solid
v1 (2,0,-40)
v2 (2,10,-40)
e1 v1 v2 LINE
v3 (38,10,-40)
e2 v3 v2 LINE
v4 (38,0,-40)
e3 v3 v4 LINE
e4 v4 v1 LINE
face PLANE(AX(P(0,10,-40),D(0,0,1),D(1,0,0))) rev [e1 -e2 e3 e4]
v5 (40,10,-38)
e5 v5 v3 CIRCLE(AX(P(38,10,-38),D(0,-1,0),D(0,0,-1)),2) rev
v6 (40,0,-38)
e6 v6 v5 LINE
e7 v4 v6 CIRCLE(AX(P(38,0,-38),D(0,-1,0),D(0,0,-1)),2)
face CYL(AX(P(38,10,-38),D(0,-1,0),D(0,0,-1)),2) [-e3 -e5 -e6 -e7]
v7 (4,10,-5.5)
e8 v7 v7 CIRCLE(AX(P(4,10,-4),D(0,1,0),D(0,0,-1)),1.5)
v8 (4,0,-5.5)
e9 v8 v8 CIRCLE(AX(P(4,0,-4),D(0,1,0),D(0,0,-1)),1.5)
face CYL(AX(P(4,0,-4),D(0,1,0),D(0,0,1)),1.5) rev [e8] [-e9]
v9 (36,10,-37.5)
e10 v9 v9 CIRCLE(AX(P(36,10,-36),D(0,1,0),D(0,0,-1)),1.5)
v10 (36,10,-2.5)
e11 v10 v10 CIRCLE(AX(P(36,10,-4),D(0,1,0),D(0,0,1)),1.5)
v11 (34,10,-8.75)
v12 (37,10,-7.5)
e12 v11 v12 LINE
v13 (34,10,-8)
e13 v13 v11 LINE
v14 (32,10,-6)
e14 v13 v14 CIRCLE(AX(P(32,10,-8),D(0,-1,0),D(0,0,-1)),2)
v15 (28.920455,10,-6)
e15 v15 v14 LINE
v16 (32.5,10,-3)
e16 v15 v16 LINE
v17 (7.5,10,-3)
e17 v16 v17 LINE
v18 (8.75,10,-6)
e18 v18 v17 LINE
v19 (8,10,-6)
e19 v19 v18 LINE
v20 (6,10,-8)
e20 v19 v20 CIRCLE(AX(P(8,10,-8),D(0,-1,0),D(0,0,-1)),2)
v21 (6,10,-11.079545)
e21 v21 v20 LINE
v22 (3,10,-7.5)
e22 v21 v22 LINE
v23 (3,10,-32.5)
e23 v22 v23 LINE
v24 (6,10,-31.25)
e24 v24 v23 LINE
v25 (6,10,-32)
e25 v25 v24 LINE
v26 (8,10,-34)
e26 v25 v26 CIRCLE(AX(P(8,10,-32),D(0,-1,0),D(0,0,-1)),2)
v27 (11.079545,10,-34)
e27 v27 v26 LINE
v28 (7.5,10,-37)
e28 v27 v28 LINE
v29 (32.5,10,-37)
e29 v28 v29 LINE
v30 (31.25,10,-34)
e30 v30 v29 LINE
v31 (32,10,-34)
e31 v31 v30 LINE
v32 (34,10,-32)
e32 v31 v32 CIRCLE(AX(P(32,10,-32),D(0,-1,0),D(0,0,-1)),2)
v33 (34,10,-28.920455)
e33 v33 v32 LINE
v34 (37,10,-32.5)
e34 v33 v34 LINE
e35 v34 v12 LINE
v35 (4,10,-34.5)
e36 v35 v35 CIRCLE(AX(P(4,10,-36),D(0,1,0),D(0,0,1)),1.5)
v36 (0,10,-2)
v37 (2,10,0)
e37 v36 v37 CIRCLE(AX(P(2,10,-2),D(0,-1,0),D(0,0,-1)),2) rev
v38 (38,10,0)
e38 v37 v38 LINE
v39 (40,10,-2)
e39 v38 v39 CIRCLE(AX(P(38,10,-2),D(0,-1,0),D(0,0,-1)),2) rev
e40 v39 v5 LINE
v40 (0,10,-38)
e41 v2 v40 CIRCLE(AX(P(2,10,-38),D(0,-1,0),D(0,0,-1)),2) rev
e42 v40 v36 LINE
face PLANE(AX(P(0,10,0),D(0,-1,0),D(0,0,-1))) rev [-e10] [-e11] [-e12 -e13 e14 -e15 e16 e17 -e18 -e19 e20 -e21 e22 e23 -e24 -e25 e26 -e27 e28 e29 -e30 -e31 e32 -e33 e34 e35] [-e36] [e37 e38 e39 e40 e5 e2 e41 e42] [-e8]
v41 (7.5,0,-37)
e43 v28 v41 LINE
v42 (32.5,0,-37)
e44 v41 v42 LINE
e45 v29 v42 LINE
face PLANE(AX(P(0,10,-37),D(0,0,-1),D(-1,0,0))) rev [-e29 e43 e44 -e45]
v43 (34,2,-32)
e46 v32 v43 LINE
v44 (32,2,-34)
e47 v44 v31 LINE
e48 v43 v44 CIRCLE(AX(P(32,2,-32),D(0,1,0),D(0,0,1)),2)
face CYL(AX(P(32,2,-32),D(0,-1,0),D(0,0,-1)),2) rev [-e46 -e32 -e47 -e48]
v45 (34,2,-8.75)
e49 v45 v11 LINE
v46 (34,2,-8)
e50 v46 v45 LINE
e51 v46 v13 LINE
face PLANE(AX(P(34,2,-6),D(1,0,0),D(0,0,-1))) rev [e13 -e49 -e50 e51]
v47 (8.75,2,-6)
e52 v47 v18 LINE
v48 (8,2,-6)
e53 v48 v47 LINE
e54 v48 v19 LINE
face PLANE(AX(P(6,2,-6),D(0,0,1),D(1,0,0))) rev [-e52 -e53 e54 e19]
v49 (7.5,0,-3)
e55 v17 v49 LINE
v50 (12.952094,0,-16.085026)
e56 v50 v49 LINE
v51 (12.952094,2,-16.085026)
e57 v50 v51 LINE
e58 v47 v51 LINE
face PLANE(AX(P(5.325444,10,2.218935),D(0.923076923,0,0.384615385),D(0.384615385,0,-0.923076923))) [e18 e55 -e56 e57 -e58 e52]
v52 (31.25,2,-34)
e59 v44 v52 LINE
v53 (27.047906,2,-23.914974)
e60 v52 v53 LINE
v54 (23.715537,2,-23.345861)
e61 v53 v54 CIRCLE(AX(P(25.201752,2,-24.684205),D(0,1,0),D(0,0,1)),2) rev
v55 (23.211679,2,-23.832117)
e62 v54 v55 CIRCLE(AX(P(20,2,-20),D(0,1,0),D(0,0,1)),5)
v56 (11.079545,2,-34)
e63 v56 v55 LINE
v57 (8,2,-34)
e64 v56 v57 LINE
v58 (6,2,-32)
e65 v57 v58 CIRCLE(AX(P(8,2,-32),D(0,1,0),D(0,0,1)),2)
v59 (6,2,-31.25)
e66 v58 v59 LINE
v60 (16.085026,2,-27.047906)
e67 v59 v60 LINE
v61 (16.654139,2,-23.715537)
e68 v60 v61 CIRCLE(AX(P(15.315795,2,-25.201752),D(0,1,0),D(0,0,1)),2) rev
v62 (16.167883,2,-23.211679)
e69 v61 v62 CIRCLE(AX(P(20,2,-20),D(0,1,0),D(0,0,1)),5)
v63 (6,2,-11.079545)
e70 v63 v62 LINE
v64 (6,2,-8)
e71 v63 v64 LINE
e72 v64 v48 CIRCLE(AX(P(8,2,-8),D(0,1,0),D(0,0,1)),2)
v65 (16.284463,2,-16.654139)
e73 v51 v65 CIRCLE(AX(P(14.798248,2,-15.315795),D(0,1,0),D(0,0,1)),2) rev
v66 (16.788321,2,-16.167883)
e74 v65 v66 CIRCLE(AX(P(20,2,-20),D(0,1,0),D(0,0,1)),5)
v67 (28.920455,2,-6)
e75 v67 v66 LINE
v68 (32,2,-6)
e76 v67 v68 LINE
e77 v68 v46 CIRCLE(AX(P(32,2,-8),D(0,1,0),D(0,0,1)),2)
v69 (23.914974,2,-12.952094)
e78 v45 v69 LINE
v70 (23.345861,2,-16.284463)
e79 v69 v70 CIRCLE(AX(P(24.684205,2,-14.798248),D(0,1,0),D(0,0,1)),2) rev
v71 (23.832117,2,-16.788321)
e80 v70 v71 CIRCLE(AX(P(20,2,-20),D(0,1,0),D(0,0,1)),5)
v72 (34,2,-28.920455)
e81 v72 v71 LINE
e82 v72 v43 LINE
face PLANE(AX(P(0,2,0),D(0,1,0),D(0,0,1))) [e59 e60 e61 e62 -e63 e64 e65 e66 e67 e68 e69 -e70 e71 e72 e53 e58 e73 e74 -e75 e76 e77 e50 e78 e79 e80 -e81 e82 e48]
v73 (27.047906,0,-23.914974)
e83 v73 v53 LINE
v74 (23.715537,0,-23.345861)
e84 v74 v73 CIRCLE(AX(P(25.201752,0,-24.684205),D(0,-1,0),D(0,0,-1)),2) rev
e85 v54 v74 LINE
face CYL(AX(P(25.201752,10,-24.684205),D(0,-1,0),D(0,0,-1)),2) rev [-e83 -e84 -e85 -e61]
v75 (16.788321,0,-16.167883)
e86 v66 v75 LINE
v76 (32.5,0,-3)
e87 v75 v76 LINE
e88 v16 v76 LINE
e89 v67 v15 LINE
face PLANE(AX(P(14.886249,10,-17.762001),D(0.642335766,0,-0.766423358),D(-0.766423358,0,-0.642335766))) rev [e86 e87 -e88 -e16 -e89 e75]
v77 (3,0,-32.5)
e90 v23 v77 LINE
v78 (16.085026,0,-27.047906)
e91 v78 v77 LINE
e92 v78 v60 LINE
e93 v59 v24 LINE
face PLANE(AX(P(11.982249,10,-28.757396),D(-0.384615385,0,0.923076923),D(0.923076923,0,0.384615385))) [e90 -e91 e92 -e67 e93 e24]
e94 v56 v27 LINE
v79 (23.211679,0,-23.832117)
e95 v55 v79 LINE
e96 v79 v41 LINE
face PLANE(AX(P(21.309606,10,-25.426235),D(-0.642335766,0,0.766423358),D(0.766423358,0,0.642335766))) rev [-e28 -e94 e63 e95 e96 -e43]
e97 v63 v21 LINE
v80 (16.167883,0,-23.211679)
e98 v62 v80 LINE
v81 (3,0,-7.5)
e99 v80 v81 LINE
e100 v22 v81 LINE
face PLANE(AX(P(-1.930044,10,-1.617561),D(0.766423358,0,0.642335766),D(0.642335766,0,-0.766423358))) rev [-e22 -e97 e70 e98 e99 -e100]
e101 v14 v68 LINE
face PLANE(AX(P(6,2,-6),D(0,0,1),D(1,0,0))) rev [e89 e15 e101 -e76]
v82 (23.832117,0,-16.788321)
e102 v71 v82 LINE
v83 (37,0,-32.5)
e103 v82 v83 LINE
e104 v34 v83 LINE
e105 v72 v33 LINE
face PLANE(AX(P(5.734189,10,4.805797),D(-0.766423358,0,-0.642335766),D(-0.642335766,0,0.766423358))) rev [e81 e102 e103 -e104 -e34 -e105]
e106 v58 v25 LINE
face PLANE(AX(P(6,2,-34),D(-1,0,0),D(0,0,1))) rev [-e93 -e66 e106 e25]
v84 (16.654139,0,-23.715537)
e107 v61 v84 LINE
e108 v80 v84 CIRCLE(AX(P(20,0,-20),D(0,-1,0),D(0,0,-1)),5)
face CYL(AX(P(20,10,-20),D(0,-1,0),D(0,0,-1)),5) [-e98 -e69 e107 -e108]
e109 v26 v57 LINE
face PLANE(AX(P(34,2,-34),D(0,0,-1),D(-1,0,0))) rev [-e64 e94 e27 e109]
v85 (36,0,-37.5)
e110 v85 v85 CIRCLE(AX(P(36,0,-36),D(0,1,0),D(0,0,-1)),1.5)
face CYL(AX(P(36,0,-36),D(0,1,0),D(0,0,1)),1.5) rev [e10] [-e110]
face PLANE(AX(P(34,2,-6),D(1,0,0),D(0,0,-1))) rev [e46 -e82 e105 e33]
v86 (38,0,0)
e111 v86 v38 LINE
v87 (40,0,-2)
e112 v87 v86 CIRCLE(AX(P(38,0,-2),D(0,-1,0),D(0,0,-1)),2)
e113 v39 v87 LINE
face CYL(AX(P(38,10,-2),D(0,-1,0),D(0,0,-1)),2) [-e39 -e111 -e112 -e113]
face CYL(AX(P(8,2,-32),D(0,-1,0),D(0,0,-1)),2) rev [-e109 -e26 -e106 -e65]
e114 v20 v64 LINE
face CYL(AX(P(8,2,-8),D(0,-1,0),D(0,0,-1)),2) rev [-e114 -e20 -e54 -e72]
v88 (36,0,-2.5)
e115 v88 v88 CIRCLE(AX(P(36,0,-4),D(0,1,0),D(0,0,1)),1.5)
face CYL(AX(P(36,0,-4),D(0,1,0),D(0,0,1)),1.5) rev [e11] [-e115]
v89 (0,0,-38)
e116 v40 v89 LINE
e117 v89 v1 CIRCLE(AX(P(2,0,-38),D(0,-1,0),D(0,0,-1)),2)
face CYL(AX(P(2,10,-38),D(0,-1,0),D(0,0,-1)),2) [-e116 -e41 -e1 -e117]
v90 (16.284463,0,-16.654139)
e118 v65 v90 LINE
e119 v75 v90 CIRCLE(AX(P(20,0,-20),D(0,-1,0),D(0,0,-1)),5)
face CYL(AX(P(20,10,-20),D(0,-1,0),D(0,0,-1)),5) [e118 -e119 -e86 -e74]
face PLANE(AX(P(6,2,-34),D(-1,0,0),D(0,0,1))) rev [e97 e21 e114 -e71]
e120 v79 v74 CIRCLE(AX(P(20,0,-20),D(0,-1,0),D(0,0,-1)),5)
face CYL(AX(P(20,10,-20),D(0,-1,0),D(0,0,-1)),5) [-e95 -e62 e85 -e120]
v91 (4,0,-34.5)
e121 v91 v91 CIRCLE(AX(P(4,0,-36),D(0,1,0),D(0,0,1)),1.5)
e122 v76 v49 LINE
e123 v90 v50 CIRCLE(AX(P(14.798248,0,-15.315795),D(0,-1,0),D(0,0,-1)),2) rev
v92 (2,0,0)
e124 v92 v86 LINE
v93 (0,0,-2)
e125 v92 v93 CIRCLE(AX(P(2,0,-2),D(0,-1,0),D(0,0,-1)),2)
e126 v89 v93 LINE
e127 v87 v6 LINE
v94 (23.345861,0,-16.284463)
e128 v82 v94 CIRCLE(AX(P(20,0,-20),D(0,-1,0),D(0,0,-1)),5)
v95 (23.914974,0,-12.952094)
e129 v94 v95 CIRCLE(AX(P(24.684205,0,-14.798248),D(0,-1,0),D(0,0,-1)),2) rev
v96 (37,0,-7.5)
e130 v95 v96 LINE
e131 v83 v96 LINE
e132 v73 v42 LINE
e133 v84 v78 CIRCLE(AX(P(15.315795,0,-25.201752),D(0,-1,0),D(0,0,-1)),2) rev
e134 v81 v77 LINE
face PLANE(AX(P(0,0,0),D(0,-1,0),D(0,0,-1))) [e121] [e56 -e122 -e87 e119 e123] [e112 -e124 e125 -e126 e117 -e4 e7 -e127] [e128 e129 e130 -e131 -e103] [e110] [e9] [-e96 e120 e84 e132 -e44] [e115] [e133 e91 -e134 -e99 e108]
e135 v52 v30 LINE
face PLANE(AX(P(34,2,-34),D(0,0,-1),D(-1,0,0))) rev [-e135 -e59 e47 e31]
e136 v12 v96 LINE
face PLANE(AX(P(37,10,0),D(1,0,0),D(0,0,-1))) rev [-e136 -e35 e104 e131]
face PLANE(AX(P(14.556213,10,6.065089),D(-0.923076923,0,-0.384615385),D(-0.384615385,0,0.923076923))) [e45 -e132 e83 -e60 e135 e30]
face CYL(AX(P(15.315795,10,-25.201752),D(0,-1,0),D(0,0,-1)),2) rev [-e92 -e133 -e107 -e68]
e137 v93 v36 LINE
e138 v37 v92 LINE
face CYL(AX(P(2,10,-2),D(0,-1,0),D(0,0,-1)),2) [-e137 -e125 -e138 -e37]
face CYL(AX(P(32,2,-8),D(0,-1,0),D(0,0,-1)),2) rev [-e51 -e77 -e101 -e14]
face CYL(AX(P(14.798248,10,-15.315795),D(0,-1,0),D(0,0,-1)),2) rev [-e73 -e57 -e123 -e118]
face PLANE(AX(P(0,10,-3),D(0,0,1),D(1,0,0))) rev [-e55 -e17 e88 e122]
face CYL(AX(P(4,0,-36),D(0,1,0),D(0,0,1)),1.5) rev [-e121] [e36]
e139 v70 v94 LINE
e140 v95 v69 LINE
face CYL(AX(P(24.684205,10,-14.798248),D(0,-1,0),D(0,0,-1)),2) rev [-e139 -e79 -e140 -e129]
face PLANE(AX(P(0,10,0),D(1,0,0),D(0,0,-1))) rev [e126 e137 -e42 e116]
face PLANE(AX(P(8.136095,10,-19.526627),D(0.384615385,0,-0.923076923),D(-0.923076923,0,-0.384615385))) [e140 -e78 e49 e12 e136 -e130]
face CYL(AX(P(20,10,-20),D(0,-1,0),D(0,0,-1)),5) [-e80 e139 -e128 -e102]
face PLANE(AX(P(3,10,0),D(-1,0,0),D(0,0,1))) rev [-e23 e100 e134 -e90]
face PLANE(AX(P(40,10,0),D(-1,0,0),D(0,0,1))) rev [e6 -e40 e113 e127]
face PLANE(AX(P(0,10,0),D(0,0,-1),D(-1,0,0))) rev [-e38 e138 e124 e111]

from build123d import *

# Parameters (mm, degrees)
SKETCH_1_W          = 40
SKETCH_1_H          = 40
EXTRUDE_1_DEPTH     = 10
FILLET_1_R          = 2
CUT_EXTRUDE_1_DEPTH = 8
FILLET_2_R          = 2
SKETCH_3_R          = 1.5
SKETCH_3_R_2        = 1.4999999999999978
SKETCH_3_R_3        = 1.500000000000004
SKETCH_3_R_4        = 1.5000000000000042
CUT_EXTRUDE_2_DEPTH = 58.445626465380286
CUT_EXTRUDE_3_DEPTH = 58.445626465380286
FILLET_3_R          = 2


with BuildPart() as part:
    # 草图1 → 凸台-拉伸1 (new body)
    with BuildSketch(Plane(origin=(0, 0, 0), x_dir=(1, 0, 0), z_dir=(0, 1, 0))):
        with Locations((20, 20)):
            Rectangle(SKETCH_1_W, SKETCH_1_H)
    extrude(amount=EXTRUDE_1_DEPTH)

    # 圆角1
    fillet_1_edges = [part.edges().sort_by_distance(p)[0] for p in [
        (0, 5, -40),
        (40, 5, -40),
        (40, 5, 0),
        (0, 5, 0),
    ]]
    fillet(fillet_1_edges, radius=FILLET_1_R)

    # 草图2 → 切除-拉伸1 (cut)
    with BuildSketch(Plane(origin=(0, 10, 0), x_dir=(1, 0, 0), z_dir=(0, 1, 0))):
        Polygon((6, 5.999999999999999), (34, 6), (34, 34), (5.999999999999999, 34), align=None)
    extrude(amount=-CUT_EXTRUDE_1_DEPTH, mode=Mode.SUBTRACT)

    # 圆角2
    fillet_2_edges = [part.edges().sort_by_distance(p)[0] for p in [
        (6, 6, -5.999999999999999),
        (5.999999999999999, 6, -34),
        (34, 6, -34),
        (34, 6, -6),
    ]]
    fillet(fillet_2_edges, radius=FILLET_2_R)

    # 草图3 → 切除-拉伸2 (cut, through all)
    with BuildSketch(Plane(origin=(0, 10, 0), x_dir=(1, 0, 0), z_dir=(0, 1, 0))):
        with Locations(Location((4.0000000000000036, 36.00000000000001, 0), (0, 0, 270))):
            Circle(SKETCH_3_R)
        with Locations(Location((4.0000000000000036, 4, 0), (0, 0, 90))):
            Circle(SKETCH_3_R_2)
        with Locations(Location((36.00000000000001, 4.000000000000004, 0), (0, 0, 270))):
            Circle(SKETCH_3_R_3)
        with Locations(Location((36.00000000000001, 36.00000000000002, 0), (0, 0, 90))):
            Circle(SKETCH_3_R_4)
    extrude(amount=-CUT_EXTRUDE_2_DEPTH, mode=Mode.SUBTRACT)

    # 草图4 → 切除-拉伸3 (cut, through all)
    with BuildSketch(Plane.XZ):
        with BuildLine():
            ThreePointArc((21.923076923076923, -24.615384615384617), (18.815219099044967, -24.857601693915647), (16.167883211678838, -23.211678832116792))
            Line((16.167883211678838, -23.211678832116792), (2.9999999999999947, -7.5))
            Line((2.999999999999995, -7.5), (2.999999999999995, -32.5))
            Line((2.9999999999999964, -32.5), (21.923076923076927, -24.615384615384624))
        make_face()
        with BuildLine():
            Line((7.500000000000055, -2.9999999999999467), (15.38461538461537, -21.923076923076906))
            ThreePointArc((15.384615384615378, -21.923076923076902), (15.14239830608436, -18.815219099044945), (16.788321167883222, -16.167883211678824))
            Line((16.788321167883222, -16.167883211678824), (32.50000000000006, -3.0000000000000355))
            Line((32.50000000000006, -3.000000000000034), (7.500000000000057, -2.9999999999999467))
        make_face()
        with BuildLine():
            Line((37.0000000000001, -7.500000000000116), (18.076923076923116, -15.384615384615365))
            ThreePointArc((18.07692307692312, -15.384615384615369), (21.184780900955076, -15.14239830608436), (23.832116788321194, -16.788321167883236))
            Line((23.832116788321194, -16.788321167883232), (36.99999999999993, -32.50000000000012))
            Line((36.99999999999993, -32.50000000000012), (37.0000000000001, -7.500000000000117))
        make_face()
        with BuildLine():
            ThreePointArc((25.000000000000004, -20), (24.53091569997632, -22.114427326655647), (23.211678832116753, -23.8321167883212))
            Line((23.211678832116757, -23.832116788321205), (7.499999999999826, -36.99999999999988))
            Line((7.499999999999827, -36.99999999999988), (32.49999999999984, -37.00000000000014))
            Line((32.49999999999984, -37.00000000000014), (24.615384615384645, -18.07692307692313))
            ThreePointArc((24.61538461538464, -18.07692307692313), (24.90290337845461, -19.01941932430911), (25.000000000000004, -20))
        make_face()
    extrude(amount=-CUT_EXTRUDE_3_DEPTH, mode=Mode.SUBTRACT)

    # 圆角3
    fillet_3_edges = [part.edges().sort_by_distance(p)[0] for p in [
        (18.076923076923116, 1, -15.384615384615367),
        (15.384615384615376, 1, -21.923076923076906),
        (24.61538461538464, 1, -18.07692307692313),
    ]]
    fillet(fillet_3_edges, radius=FILLET_3_R)
    fillet_3_2_edges = [part.edges().sort_by_distance(p)[0] for p in [
        (21.923076923076927, 1, -24.61538461538462),
    ]]
    fillet(fillet_3_2_edges, radius=FILLET_3_R - 0.0001)  # a hair under: the kernel refuses the full size


solid = part.part
